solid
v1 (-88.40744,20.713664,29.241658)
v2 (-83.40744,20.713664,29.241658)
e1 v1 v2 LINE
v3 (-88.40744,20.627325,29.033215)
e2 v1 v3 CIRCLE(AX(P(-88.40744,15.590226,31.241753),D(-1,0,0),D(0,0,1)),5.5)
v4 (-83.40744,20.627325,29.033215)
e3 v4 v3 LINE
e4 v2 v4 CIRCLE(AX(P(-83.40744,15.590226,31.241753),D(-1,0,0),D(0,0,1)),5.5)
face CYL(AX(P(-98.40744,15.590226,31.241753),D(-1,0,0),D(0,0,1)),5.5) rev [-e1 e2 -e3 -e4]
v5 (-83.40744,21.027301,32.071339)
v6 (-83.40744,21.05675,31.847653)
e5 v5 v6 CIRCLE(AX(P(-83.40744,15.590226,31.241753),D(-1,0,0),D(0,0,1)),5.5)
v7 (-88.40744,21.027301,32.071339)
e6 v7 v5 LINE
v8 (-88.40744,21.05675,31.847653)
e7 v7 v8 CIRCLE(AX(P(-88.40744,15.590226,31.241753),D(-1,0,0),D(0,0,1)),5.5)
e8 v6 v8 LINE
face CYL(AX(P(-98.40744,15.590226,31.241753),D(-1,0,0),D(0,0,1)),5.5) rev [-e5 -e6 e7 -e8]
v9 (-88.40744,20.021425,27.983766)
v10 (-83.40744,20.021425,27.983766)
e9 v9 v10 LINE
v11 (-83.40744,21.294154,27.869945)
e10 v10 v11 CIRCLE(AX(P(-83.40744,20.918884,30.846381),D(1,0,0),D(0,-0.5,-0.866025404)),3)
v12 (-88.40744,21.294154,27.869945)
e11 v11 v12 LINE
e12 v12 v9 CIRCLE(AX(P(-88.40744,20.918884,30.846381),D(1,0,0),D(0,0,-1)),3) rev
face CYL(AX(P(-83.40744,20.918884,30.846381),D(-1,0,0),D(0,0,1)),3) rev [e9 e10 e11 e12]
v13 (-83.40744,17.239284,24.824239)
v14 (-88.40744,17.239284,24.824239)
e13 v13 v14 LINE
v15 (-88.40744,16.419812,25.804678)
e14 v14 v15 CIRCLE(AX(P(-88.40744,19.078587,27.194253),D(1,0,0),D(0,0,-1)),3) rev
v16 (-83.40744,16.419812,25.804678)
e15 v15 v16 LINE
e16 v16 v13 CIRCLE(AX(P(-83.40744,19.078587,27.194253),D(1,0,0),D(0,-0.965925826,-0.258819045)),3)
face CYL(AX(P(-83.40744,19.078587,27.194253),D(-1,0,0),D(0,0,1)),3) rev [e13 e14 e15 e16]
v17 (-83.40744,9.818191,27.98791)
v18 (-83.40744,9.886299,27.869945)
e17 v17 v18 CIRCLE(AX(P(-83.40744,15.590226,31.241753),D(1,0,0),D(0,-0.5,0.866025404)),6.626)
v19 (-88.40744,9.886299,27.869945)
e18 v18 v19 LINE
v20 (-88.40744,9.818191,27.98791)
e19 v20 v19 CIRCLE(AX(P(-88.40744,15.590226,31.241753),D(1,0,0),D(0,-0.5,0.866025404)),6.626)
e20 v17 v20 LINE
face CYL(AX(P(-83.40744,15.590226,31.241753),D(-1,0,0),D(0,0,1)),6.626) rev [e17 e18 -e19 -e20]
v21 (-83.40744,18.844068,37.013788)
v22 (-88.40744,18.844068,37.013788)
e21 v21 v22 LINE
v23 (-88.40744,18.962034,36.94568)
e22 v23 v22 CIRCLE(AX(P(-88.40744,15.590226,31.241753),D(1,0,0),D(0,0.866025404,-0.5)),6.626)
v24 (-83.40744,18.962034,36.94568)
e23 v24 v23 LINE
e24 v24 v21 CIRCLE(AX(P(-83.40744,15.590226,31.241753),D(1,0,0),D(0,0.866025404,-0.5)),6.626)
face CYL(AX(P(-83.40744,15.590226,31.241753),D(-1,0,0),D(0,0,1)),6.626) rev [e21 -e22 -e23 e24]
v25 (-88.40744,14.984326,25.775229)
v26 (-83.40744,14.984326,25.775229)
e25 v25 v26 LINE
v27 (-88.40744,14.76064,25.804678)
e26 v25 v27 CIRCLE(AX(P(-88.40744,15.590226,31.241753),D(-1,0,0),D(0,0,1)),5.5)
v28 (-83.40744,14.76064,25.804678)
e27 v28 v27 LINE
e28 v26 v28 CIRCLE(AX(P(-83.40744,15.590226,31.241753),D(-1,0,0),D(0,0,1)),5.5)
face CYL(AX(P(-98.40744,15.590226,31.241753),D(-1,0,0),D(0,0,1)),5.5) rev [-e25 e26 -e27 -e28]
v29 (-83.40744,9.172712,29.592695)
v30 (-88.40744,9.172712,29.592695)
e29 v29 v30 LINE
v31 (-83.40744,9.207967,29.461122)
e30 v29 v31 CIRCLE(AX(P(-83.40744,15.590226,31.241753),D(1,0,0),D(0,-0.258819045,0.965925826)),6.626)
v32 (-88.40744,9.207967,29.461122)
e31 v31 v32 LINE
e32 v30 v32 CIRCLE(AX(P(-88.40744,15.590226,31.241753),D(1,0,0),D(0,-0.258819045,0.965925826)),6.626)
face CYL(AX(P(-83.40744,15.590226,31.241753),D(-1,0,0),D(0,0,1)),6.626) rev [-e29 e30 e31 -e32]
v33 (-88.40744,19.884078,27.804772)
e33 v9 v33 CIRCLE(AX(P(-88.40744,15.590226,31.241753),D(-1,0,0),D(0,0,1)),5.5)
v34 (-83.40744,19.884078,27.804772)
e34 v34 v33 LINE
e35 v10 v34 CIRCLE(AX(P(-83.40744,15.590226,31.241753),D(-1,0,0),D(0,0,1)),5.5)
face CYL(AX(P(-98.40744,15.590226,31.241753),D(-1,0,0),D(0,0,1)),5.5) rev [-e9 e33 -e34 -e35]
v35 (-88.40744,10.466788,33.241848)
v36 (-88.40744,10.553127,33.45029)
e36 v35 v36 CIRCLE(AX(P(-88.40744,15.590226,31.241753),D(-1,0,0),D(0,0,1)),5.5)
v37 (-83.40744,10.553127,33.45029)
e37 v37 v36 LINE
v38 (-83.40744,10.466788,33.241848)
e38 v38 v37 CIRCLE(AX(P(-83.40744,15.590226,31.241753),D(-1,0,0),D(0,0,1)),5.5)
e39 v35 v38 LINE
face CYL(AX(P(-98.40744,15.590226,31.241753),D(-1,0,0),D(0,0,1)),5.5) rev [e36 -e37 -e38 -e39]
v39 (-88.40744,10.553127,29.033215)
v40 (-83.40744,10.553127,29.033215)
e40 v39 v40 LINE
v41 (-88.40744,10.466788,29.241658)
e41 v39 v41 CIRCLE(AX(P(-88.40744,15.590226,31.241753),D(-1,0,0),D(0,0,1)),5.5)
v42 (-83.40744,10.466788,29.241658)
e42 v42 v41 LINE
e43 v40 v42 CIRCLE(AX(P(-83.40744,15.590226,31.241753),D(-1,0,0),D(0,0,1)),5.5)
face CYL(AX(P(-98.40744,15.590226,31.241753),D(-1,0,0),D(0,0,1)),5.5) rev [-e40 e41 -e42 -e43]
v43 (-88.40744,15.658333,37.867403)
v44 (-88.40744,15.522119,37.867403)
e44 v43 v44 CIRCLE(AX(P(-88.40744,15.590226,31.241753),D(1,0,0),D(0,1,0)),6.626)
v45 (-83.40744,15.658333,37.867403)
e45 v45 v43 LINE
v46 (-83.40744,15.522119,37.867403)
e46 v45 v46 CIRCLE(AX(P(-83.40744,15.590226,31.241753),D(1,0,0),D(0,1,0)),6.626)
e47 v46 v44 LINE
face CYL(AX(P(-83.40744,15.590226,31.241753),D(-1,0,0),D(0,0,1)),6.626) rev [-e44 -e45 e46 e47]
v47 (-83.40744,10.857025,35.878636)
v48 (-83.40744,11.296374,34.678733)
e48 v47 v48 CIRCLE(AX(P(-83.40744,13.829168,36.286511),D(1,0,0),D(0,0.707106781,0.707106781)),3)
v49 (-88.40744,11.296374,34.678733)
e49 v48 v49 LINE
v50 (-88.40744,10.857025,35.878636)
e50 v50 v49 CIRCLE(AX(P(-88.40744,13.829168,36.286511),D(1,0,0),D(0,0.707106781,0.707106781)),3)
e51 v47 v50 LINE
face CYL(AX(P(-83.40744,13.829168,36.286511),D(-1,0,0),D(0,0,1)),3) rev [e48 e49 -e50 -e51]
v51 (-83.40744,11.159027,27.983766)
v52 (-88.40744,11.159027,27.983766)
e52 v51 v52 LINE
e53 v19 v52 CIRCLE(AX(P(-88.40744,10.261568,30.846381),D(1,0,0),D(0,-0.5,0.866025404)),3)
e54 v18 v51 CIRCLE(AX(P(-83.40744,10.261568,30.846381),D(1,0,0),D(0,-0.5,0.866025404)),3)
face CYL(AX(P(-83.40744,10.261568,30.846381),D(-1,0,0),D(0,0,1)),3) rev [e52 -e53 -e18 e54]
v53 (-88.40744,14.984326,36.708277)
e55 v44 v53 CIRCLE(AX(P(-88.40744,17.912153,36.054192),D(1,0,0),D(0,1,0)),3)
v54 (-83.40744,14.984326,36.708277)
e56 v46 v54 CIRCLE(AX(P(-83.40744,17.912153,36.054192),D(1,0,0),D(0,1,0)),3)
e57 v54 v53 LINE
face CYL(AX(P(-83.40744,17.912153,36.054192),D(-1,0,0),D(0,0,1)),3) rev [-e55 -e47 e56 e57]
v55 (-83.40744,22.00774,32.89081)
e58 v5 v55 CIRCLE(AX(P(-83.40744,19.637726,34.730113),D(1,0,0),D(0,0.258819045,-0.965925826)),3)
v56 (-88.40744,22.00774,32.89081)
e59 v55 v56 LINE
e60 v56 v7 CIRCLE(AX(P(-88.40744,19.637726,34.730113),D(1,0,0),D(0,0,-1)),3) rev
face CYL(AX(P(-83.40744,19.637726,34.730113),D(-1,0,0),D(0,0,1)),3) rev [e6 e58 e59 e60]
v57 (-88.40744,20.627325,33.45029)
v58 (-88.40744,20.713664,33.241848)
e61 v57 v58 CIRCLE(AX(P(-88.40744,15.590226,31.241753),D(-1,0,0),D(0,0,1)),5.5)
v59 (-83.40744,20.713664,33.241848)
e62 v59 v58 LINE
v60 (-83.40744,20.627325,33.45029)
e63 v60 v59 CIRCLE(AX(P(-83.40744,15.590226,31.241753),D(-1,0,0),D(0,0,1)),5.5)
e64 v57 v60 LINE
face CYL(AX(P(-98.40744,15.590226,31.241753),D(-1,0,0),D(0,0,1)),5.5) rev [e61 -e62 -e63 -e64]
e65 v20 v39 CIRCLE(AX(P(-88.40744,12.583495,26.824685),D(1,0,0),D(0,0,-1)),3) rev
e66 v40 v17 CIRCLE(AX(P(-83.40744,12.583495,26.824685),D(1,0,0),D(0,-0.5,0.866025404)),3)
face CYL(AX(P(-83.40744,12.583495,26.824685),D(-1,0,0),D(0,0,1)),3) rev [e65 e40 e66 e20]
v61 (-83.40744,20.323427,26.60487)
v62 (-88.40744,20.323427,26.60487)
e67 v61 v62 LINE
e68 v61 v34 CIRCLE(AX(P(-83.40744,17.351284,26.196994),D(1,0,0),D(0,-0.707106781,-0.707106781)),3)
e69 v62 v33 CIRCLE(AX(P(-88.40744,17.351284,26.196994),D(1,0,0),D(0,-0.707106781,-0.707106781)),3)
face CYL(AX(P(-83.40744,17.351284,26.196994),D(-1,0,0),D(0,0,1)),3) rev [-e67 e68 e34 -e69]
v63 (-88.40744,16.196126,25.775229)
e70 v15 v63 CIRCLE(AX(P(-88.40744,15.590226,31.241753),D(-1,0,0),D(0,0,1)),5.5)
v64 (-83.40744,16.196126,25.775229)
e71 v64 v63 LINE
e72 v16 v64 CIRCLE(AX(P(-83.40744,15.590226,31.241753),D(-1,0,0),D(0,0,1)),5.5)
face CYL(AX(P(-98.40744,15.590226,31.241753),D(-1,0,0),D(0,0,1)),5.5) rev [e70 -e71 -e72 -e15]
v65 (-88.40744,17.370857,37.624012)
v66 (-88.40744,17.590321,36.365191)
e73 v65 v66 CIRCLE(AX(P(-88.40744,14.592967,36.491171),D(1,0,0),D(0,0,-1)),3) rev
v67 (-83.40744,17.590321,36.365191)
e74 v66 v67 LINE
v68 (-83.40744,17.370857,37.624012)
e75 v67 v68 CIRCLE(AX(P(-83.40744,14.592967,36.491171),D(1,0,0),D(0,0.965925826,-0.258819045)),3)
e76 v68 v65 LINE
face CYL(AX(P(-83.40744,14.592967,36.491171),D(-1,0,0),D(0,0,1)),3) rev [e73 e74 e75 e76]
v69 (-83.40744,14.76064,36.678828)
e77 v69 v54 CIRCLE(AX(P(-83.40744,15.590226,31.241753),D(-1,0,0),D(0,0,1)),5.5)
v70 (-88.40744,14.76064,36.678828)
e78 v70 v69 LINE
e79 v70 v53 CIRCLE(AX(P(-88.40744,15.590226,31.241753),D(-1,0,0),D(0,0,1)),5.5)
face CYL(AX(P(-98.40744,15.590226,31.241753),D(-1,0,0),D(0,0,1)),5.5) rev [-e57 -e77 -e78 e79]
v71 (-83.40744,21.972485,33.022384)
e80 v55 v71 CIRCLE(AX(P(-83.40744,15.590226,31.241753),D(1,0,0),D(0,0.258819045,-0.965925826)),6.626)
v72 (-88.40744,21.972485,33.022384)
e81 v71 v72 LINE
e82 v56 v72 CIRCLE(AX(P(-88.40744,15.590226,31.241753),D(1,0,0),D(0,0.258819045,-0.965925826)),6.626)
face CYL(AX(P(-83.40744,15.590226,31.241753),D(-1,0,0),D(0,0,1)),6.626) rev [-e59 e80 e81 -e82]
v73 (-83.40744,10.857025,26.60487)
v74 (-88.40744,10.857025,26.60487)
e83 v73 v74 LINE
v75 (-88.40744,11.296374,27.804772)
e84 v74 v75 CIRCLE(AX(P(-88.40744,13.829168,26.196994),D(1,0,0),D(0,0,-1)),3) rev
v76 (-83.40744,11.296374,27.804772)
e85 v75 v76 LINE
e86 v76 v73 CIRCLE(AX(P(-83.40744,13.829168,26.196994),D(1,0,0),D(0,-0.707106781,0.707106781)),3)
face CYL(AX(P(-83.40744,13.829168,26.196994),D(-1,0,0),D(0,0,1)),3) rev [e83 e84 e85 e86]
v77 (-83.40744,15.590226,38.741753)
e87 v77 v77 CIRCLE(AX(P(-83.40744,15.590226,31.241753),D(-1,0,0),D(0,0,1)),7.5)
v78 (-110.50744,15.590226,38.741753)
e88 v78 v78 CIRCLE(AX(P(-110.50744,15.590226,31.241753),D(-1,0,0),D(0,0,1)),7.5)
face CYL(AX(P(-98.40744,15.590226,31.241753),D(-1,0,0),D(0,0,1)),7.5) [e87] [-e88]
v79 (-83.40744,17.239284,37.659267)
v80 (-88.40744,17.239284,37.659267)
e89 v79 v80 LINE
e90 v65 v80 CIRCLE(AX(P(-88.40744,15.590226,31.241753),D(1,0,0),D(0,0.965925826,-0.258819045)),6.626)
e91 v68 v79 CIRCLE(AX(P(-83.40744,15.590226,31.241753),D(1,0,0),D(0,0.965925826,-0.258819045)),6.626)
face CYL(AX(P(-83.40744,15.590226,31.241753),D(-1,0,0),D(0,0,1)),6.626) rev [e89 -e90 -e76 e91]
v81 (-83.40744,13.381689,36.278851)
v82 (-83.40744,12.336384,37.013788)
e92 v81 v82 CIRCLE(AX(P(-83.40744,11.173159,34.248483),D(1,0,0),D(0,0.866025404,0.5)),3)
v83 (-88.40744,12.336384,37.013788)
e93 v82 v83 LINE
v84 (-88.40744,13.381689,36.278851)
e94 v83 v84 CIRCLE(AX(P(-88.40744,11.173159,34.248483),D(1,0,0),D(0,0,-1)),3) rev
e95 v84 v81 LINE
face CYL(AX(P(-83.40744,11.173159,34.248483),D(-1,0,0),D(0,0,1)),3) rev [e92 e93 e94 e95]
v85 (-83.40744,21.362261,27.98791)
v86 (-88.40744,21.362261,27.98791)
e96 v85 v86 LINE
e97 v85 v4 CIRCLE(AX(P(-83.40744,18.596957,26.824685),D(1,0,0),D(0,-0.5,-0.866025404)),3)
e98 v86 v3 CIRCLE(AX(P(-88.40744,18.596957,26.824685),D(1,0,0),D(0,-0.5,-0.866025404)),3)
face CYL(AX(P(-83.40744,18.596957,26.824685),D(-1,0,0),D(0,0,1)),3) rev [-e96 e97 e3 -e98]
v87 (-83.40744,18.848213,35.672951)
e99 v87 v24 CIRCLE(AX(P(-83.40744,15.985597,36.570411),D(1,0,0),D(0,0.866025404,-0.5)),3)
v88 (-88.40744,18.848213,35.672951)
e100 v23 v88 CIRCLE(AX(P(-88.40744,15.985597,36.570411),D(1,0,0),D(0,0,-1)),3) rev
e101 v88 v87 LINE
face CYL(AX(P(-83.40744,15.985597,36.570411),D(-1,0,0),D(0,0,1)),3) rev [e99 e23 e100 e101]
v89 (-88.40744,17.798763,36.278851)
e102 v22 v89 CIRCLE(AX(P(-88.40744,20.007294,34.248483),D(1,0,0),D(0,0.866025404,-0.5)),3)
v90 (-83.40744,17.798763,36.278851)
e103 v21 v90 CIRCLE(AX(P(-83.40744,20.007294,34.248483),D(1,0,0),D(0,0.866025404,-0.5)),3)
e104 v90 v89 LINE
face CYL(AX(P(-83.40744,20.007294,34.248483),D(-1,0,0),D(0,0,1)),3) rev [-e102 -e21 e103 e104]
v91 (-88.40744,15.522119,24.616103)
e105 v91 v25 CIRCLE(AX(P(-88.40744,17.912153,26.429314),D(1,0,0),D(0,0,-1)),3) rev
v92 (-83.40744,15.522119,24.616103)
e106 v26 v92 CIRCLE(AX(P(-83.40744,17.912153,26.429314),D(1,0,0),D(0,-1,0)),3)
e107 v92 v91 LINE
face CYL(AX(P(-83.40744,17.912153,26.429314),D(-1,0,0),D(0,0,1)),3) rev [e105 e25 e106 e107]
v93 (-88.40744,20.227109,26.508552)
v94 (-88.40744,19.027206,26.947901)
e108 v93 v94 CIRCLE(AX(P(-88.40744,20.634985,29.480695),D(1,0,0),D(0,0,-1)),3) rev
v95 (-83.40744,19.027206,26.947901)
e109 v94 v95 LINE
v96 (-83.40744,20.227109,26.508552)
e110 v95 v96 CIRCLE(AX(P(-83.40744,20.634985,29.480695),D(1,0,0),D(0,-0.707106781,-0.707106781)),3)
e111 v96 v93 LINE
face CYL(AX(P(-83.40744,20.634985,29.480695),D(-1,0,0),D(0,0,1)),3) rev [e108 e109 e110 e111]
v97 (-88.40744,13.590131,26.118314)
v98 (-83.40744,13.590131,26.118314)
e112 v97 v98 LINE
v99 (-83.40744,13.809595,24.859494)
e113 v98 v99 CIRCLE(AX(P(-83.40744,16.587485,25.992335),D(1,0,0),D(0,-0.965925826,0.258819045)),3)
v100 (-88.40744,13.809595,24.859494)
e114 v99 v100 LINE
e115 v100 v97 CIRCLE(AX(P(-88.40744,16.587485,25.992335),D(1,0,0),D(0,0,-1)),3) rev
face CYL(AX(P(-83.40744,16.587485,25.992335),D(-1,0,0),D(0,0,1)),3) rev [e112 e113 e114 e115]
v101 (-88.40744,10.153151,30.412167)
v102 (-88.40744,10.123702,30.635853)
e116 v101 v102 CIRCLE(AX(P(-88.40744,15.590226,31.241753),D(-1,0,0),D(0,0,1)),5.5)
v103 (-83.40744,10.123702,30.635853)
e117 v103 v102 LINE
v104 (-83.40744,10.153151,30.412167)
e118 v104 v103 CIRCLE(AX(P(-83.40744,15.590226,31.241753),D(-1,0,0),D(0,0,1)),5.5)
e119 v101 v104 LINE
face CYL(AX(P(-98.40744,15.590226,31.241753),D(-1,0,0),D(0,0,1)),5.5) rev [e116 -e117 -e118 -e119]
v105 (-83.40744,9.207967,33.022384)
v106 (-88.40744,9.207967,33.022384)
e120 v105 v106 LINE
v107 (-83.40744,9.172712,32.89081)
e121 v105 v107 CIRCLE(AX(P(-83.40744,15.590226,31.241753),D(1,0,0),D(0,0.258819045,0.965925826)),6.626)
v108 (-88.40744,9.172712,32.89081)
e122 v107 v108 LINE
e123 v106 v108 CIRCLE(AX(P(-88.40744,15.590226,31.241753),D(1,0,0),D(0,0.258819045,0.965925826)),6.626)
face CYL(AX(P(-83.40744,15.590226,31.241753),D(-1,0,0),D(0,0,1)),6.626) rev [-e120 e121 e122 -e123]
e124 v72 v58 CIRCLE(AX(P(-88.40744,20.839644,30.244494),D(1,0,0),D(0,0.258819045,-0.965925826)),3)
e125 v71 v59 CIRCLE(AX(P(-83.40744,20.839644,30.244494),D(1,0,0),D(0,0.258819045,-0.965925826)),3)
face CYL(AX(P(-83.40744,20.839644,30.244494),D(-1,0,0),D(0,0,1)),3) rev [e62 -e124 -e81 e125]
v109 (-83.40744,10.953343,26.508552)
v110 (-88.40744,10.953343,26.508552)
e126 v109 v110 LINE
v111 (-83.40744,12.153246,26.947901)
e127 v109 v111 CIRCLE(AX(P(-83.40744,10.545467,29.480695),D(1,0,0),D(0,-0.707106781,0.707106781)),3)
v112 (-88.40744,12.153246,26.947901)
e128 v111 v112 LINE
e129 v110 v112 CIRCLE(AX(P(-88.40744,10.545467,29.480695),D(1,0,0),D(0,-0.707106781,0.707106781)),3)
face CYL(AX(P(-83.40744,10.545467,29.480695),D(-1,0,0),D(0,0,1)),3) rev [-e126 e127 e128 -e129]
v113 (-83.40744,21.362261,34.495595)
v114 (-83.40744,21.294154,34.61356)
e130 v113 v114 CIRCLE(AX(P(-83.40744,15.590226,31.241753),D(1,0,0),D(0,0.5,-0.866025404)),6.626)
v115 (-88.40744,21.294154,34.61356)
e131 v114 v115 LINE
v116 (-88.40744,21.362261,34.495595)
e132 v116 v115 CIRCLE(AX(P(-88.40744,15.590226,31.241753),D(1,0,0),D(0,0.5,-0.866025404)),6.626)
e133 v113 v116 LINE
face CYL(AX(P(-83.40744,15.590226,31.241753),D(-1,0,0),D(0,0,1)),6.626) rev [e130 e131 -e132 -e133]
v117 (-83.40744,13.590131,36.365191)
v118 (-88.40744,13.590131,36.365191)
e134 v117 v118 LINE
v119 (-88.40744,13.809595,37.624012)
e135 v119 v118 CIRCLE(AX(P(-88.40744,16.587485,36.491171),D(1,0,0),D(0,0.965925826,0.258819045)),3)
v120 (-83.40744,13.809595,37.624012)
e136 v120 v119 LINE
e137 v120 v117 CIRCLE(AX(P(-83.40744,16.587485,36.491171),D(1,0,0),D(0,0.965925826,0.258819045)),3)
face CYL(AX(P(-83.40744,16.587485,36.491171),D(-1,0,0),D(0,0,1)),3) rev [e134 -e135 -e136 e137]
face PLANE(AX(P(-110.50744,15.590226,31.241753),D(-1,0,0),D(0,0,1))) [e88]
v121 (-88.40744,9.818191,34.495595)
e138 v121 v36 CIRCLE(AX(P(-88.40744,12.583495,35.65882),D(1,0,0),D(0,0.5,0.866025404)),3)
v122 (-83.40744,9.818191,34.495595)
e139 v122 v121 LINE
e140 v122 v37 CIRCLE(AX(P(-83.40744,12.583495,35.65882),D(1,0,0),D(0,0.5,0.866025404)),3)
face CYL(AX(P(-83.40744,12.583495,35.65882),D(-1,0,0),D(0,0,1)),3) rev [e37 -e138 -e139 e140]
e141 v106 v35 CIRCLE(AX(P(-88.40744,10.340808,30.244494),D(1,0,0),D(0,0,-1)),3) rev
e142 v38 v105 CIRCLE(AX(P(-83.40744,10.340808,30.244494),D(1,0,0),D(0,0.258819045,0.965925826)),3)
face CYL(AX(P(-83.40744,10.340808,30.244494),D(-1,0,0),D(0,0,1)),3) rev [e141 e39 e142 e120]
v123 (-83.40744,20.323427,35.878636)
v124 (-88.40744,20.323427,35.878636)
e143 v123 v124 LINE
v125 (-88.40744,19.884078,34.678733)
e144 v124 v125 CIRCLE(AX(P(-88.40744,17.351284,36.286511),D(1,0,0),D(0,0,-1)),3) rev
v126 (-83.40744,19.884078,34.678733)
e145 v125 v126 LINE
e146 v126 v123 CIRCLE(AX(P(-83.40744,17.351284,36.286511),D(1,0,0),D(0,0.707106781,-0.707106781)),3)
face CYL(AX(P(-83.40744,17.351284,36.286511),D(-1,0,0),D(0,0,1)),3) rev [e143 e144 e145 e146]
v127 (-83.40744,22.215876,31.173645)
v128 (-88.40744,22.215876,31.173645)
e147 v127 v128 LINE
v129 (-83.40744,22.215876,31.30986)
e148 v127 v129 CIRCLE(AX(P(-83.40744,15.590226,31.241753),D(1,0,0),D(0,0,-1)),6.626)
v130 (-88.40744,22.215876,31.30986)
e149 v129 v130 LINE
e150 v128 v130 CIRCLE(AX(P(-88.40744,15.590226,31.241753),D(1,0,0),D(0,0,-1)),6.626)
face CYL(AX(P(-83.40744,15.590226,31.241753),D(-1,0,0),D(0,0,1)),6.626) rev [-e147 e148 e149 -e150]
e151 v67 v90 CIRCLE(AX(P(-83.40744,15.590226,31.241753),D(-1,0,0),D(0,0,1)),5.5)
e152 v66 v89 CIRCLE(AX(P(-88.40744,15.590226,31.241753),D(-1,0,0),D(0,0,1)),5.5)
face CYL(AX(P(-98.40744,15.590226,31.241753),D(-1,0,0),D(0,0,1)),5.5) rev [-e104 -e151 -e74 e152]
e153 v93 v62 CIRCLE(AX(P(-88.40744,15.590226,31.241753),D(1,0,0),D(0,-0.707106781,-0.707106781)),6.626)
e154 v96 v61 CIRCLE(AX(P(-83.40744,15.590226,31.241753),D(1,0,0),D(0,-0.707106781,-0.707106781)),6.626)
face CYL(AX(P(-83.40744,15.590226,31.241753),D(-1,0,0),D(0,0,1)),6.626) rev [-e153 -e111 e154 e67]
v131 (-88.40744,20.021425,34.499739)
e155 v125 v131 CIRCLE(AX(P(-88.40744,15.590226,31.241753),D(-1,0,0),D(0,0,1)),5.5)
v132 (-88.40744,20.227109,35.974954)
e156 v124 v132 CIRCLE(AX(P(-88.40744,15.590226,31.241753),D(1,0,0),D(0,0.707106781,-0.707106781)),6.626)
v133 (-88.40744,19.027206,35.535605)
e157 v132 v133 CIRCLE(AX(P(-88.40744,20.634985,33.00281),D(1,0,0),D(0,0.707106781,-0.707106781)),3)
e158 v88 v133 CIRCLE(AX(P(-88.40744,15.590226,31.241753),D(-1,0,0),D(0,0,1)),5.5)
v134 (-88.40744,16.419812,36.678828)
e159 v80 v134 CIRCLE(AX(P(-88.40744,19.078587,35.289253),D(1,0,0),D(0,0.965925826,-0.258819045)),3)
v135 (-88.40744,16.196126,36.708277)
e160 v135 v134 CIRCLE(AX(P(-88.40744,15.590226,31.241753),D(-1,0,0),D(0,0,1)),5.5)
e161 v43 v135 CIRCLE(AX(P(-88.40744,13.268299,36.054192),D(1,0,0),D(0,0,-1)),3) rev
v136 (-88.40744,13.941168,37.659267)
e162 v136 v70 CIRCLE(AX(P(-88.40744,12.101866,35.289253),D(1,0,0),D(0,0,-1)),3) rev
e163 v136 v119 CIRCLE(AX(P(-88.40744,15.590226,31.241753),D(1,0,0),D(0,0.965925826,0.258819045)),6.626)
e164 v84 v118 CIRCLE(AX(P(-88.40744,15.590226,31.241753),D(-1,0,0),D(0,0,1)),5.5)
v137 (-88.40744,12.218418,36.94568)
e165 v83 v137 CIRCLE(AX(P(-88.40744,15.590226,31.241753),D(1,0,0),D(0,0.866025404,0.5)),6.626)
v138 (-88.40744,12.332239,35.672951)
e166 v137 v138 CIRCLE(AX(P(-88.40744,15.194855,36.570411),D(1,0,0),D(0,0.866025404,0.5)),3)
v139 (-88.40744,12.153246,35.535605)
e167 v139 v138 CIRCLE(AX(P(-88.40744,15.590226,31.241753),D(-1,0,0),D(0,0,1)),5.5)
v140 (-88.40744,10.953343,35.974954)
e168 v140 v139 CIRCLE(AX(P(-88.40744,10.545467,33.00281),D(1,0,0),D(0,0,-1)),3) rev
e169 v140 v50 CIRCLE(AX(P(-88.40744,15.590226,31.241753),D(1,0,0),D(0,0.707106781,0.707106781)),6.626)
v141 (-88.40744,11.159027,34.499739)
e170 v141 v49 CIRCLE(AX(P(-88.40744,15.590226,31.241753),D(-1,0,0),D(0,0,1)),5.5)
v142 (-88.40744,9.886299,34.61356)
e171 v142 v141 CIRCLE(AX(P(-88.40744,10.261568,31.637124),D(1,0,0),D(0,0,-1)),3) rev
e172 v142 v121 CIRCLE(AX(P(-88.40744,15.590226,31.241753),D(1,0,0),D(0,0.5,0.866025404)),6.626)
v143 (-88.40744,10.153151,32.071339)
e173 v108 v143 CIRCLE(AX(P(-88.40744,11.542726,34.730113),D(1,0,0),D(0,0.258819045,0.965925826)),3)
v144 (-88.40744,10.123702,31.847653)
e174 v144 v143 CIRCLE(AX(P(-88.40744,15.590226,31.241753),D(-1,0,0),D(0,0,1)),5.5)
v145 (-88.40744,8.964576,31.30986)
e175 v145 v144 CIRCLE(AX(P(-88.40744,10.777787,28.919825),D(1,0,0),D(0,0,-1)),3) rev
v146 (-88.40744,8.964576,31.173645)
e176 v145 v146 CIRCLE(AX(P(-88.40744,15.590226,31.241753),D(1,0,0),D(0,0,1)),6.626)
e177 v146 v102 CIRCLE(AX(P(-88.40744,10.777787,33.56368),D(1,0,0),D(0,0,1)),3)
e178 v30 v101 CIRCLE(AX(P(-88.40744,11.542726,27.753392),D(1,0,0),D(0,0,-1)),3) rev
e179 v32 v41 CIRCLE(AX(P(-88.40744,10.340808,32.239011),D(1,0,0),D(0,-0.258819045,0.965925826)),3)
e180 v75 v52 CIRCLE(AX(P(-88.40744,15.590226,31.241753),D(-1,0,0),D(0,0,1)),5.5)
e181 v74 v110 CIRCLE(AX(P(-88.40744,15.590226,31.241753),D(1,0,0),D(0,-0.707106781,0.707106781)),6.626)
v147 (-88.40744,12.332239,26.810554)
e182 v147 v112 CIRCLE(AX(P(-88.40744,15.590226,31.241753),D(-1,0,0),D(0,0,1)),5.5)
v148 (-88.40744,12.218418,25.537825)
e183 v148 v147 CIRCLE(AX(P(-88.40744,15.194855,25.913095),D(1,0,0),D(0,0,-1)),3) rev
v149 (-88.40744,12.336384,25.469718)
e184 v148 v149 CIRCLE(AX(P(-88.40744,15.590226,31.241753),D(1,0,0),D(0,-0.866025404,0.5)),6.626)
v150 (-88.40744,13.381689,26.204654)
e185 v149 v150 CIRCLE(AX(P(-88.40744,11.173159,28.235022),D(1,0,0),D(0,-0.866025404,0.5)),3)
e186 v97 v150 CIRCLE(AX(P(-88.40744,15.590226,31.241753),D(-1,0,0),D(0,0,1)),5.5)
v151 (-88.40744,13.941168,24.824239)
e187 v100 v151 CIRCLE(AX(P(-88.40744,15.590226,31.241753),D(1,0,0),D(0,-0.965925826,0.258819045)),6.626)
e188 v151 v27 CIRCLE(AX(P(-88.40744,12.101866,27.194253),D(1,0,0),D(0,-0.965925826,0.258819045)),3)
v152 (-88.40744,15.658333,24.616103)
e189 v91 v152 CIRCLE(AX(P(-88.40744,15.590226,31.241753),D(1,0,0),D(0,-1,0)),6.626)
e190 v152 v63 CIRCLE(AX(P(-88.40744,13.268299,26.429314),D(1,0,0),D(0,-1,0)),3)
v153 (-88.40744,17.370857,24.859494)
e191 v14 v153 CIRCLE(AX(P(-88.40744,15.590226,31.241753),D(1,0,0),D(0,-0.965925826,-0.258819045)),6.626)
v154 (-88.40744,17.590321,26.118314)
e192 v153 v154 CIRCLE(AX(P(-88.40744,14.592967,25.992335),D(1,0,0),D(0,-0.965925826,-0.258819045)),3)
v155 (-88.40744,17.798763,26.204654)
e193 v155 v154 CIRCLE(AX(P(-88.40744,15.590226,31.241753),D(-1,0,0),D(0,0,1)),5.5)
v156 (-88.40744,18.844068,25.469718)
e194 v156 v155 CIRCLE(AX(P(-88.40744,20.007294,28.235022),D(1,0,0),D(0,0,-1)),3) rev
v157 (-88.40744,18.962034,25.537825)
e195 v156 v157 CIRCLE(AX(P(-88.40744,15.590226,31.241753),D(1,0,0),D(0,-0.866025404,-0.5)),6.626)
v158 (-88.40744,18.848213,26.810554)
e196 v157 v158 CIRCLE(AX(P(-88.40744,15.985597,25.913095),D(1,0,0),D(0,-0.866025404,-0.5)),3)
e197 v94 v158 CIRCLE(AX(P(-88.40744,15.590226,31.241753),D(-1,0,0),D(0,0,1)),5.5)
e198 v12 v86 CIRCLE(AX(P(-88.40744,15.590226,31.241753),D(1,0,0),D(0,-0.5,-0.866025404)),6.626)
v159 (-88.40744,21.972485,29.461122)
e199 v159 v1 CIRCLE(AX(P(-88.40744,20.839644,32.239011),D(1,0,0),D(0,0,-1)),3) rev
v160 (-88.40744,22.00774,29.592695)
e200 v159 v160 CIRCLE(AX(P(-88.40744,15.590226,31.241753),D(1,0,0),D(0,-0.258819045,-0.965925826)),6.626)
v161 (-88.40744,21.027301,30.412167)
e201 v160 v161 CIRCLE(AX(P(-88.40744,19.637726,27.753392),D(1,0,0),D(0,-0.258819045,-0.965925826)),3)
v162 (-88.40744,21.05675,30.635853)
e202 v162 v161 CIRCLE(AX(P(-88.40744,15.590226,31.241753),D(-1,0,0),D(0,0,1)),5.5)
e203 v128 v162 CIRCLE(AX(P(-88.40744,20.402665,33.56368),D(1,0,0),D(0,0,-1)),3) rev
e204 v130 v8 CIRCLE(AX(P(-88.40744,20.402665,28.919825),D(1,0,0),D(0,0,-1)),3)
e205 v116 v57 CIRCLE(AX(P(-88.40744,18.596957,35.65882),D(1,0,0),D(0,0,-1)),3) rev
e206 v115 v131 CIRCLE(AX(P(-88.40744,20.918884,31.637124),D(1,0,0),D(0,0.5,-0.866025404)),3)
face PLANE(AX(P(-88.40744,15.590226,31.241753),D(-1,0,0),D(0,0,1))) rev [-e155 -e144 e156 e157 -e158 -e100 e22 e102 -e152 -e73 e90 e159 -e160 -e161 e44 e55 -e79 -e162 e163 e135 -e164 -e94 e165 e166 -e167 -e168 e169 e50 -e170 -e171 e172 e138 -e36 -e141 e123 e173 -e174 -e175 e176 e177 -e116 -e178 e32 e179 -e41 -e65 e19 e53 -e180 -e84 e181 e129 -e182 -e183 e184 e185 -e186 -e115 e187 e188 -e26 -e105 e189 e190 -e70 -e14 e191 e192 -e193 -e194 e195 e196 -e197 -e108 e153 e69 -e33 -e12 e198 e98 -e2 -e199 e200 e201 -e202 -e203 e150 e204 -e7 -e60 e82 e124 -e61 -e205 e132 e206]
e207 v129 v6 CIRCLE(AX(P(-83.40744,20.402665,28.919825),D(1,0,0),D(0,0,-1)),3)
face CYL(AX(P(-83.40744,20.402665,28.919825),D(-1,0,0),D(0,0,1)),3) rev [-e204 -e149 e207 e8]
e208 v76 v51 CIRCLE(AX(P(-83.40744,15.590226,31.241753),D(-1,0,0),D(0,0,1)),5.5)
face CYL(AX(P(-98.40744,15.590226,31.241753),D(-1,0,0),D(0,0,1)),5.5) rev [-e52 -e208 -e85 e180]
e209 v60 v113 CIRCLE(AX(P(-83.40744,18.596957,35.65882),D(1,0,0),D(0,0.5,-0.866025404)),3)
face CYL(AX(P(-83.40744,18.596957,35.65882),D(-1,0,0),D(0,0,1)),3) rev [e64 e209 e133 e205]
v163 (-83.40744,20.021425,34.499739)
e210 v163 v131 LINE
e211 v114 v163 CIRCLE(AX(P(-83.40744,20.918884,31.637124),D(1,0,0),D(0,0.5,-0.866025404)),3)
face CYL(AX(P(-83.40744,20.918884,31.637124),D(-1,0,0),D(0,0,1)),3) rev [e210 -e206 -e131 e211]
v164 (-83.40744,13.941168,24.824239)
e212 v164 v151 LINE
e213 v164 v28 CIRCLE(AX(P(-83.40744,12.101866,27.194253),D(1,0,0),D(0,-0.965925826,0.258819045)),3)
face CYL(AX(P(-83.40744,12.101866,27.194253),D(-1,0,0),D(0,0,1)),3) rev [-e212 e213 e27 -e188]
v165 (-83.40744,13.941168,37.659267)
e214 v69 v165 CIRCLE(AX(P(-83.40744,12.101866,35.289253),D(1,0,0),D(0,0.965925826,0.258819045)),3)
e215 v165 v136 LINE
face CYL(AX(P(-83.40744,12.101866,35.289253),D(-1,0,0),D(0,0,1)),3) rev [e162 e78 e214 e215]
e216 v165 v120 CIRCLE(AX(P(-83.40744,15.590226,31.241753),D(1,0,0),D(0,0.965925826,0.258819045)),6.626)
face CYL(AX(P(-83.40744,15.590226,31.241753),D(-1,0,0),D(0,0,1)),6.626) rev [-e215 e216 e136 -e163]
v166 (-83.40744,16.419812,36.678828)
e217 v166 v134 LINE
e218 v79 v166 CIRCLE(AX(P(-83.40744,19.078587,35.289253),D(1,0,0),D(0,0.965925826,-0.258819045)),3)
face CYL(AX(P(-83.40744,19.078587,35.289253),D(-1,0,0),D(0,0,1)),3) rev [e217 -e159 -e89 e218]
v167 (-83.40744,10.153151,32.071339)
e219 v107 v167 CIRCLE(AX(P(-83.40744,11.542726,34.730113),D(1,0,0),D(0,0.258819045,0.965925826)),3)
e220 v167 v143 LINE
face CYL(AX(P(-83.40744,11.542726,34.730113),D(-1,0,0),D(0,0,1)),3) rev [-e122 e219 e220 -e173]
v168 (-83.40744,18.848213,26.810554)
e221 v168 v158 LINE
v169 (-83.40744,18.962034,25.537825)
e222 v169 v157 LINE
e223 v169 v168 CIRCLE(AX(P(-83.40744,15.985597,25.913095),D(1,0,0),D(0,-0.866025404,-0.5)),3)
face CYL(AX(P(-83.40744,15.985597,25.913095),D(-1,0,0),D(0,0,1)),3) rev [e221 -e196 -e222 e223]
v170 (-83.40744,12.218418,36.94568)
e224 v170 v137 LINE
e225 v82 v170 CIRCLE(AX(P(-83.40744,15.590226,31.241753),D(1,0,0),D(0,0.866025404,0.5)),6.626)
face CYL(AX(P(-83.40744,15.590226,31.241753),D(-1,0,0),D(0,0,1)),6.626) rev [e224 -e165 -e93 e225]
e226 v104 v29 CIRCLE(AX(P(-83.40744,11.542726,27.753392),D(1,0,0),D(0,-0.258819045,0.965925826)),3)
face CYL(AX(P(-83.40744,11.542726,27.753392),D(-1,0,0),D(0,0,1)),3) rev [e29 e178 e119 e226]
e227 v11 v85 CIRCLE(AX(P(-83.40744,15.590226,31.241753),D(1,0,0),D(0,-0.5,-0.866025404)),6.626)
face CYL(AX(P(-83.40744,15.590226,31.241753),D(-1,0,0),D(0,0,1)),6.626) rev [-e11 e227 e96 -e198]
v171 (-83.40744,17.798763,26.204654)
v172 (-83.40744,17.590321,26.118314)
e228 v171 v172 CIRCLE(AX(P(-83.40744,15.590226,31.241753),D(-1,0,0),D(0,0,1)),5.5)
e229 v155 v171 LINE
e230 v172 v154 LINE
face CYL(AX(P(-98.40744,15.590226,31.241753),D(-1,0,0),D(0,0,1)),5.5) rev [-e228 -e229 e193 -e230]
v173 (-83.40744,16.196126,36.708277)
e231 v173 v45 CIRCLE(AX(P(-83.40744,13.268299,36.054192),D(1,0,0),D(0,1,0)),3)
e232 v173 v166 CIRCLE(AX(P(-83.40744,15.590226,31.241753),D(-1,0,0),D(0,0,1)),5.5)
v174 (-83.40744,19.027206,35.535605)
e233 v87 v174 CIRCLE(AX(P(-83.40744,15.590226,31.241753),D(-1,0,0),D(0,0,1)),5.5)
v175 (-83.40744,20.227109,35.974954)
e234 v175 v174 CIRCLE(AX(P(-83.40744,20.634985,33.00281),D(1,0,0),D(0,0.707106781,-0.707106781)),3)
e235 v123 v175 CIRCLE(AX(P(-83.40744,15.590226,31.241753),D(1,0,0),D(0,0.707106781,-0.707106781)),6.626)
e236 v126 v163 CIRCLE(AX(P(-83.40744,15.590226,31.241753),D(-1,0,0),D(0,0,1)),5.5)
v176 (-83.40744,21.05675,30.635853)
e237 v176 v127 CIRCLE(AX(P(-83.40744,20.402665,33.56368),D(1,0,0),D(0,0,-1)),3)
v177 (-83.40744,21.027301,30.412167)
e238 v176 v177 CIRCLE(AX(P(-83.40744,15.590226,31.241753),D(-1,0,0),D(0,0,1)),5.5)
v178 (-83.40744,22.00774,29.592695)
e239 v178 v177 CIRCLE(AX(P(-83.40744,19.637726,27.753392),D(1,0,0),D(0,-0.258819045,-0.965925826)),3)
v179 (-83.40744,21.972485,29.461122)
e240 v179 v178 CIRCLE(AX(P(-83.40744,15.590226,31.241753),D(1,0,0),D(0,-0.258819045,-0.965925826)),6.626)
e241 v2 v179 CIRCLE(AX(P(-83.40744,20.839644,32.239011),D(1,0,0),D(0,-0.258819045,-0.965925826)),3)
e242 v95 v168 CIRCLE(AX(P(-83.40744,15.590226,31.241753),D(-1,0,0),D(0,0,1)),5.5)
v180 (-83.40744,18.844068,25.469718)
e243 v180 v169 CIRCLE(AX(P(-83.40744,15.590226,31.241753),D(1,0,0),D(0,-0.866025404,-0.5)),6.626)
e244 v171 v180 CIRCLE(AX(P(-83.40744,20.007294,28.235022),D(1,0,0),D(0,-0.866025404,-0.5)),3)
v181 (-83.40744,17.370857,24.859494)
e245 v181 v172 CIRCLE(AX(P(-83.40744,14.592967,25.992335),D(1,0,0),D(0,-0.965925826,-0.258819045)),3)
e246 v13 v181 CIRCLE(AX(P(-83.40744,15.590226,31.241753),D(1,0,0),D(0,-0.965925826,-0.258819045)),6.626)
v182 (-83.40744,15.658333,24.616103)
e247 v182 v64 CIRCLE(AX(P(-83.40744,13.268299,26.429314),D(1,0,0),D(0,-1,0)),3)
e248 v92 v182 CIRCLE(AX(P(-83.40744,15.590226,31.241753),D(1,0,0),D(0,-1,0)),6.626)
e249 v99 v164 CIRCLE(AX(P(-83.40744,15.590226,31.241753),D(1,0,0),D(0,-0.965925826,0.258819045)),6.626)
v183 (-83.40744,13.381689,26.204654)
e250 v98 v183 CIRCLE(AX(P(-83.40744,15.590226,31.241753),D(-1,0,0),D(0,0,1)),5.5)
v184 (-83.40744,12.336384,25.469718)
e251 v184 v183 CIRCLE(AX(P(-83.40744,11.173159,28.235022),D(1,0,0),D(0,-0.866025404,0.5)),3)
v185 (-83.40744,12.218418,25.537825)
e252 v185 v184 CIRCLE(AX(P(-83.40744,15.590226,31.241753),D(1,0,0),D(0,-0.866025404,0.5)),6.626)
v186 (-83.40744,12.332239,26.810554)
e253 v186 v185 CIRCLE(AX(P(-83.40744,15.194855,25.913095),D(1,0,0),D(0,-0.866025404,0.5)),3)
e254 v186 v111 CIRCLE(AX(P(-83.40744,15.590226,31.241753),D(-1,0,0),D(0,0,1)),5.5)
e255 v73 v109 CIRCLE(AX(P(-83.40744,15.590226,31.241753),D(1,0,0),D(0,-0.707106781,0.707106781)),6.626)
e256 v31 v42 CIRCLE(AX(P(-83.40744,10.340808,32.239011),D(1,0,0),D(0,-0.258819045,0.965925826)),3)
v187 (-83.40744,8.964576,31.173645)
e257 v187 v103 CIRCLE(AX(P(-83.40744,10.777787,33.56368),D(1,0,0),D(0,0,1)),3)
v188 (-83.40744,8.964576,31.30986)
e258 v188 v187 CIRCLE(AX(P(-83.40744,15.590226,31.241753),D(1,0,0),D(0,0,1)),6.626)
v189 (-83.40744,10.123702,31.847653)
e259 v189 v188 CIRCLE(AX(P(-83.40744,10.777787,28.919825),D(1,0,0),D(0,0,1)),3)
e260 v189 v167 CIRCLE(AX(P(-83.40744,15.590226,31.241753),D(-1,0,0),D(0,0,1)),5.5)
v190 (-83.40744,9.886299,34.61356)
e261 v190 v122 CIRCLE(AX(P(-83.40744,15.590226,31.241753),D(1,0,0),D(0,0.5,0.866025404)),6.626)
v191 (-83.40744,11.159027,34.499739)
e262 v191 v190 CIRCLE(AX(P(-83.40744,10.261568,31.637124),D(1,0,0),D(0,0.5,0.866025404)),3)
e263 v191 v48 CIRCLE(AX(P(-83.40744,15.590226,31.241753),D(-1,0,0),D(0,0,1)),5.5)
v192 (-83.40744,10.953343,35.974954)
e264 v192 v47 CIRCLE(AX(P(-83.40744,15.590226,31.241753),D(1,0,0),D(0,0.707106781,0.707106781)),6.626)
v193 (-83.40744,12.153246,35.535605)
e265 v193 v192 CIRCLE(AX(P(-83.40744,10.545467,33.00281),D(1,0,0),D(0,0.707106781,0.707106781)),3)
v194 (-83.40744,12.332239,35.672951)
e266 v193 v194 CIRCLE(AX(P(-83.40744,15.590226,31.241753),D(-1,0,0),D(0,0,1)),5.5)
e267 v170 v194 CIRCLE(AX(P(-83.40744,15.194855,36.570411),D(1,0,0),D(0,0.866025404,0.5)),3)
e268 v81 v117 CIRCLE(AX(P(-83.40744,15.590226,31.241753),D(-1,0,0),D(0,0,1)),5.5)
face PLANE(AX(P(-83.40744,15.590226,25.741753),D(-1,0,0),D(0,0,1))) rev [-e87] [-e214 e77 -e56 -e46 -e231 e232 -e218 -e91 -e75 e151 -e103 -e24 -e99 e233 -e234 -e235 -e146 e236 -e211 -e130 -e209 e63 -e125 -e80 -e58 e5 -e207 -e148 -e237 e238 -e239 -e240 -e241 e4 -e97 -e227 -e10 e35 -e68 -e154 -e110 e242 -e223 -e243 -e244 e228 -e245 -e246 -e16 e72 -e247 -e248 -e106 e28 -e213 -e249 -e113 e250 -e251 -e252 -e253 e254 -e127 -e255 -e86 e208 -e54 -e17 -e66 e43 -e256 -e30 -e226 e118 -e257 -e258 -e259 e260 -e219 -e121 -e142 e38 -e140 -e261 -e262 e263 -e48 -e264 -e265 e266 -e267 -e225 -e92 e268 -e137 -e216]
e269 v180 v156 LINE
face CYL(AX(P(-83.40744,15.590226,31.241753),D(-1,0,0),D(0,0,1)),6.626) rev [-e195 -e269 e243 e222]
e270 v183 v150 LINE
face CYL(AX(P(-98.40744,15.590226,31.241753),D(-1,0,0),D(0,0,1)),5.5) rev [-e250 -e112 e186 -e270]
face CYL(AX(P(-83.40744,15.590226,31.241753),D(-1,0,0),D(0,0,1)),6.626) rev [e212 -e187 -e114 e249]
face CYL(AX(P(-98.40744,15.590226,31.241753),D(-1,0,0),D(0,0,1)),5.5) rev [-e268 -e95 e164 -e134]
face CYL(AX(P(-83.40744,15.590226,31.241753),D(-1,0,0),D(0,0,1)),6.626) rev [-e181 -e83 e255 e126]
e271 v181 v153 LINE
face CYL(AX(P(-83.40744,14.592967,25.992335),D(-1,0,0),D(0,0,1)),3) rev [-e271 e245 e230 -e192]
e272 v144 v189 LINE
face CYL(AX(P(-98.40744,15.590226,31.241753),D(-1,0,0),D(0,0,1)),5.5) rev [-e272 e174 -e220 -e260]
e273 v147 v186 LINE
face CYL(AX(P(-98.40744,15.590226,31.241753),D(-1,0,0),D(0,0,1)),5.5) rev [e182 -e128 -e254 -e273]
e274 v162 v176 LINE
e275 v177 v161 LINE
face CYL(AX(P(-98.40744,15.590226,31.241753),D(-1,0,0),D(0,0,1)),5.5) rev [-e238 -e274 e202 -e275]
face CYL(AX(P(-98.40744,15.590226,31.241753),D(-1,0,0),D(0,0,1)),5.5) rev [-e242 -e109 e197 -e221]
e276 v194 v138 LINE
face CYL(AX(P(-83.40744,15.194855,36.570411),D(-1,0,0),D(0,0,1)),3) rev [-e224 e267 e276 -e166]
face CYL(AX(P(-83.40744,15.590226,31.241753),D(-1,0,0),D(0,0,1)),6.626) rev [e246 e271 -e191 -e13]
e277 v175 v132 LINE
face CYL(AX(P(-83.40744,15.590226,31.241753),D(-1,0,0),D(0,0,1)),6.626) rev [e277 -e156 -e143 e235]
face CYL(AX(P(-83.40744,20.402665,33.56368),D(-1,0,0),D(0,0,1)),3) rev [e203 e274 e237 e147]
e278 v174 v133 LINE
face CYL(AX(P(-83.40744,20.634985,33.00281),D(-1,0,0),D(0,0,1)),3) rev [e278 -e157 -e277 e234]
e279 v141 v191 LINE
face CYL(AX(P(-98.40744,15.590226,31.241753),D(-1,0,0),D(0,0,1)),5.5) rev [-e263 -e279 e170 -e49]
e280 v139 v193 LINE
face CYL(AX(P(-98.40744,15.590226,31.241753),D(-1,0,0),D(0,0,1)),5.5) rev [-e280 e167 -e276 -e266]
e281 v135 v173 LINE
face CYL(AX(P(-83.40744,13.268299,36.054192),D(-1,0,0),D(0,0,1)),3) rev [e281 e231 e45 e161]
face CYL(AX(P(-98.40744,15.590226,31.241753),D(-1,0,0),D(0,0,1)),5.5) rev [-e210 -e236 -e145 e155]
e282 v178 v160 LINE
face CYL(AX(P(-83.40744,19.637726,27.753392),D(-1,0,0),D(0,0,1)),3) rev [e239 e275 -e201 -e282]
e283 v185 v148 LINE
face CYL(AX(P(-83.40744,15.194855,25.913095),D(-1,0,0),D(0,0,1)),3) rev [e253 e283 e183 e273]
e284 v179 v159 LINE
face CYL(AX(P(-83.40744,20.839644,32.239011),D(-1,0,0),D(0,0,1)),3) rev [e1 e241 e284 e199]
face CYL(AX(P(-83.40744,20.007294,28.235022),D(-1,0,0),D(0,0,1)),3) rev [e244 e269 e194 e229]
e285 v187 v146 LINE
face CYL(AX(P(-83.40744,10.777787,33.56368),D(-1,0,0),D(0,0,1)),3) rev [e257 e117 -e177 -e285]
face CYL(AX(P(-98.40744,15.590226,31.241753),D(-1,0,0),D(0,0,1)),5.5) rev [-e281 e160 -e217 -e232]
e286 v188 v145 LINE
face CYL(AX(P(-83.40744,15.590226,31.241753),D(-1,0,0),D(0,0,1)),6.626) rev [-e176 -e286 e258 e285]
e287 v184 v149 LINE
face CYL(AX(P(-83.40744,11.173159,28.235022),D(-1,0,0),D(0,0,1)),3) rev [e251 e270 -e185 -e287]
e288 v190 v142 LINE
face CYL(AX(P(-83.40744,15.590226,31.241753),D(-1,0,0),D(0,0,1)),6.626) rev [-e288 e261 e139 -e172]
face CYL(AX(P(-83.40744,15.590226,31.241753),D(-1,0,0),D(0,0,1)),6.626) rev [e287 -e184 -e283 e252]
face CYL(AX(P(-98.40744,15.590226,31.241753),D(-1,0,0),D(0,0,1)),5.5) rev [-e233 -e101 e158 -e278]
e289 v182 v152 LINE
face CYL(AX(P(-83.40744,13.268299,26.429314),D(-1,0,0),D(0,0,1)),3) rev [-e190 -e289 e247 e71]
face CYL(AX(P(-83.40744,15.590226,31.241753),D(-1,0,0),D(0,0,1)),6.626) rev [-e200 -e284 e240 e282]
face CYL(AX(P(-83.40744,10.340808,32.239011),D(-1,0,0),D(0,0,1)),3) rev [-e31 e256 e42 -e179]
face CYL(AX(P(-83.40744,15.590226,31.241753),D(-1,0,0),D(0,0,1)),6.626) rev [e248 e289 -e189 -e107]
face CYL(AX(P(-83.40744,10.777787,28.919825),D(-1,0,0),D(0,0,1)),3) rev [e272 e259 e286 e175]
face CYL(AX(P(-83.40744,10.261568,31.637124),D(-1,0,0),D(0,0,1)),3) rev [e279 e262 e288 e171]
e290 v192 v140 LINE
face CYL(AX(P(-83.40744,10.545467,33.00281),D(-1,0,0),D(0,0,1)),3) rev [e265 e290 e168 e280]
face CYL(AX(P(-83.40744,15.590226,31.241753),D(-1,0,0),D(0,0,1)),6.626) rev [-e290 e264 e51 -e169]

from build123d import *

# Parameters (mm, degrees)
INTERNAL_START                  = -88.407440494
INTERNAL_SPUR_GEAR_AM_OUTLINE_R = 7.5
INTERNAL_SPUR_GEAR_AM_DEPTH     = 5
BOSS_EXTRUDE2_START             = 22.1
SKETCH3_R                       = 7.5
BOSS_EXTRUDE2_DEPTH             = 22.1


# Read off the part's stored shape, not the designer's step: internal spur gear_am
with BuildPart() as part:
    # internal spur gear_am outline → internal spur gear_am (new body)
    with BuildSketch(Plane.YZ.offset(INTERNAL_START)):
        with Locations((15.590226083, 31.241752714)):
            Circle(INTERNAL_SPUR_GEAR_AM_OUTLINE_R)
        with BuildLine():
            ThreePointArc((22.215876043, 31.173645397), (21.665278496, 30.84231879), (21.056750139, 30.635852768))
            ThreePointArc((21.056750139, 30.635852768), (21.043172821, 30.523858657), (21.027301295, 30.412166585))
            ThreePointArc((21.027301295, 30.412166585), (21.561657212, 30.055236993), (22.007739967, 29.592694935))
            ThreePointArc((22.007739967, 29.592694935), (21.990450608, 29.526817722), (21.972485025, 29.461121702))
            ThreePointArc((21.972485025, 29.461121702), (21.354894998, 29.283589907), (20.713664403, 29.241657772))
            ThreePointArc((20.713664403, 29.241657772), (20.671563512, 29.136993836), (20.62732476, 29.033215432))
            ThreePointArc((20.62732476, 29.033215432), (21.051092764, 28.550146434), (21.362260924, 27.987910402))
            ThreePointArc((21.362260924, 27.987910402), (21.328510409, 27.928752714), (21.294153607, 27.869945067))
            ThreePointArc((21.294153607, 27.869945067), (20.65165884, 27.858306583), (20.021424813, 27.98376594))
            ThreePointArc((20.021424813, 27.98376594), (19.953669455, 27.893564855), (19.884078274, 27.804772446))
            ThreePointArc((19.884078274, 27.804772446), (20.168379277, 27.228484394), (20.323427246, 26.604869844))
            ThreePointArc((20.323427246, 26.604869844), (20.275515615, 26.556463182), (20.227108954, 26.508551552))
            ThreePointArc((20.227108954, 26.508551552), (19.603494404, 26.663599521), (19.027206352, 26.947900524))
            ThreePointArc((19.027206352, 26.947900524), (18.938413943, 26.878309343), (18.848212857, 26.810553985))
            ThreePointArc((18.848212857, 26.810553985), (18.973672215, 26.180319958), (18.96203373, 25.537825191))
            ThreePointArc((18.96203373, 25.537825191), (18.903226083, 25.503468389), (18.844068396, 25.469717874))
            ThreePointArc((18.844068396, 25.469717874), (18.281832364, 25.780886034), (17.798763365, 26.204654038))
            ThreePointArc((17.798763365, 26.204654038), (17.694984961, 26.160415286), (17.590321026, 26.118314394))
            ThreePointArc((17.590321026, 26.118314394), (17.548388891, 25.4770838), (17.370857096, 24.859493773))
            ThreePointArc((17.370857096, 24.859493773), (17.305161076, 24.841528189), (17.239283862, 24.824238831))
            ThreePointArc((17.239283862, 24.824238831), (16.776741804, 25.270321586), (16.419812213, 25.804677503))
            ThreePointArc((16.419812213, 25.804677503), (16.308120141, 25.788805977), (16.19612603, 25.775228658))
            ThreePointArc((16.19612603, 25.775228658), (15.989660007, 25.166700302), (15.658333401, 24.616102754))
            ThreePointArc((15.658333401, 24.616102754), (15.590226083, 24.615752714), (15.522118766, 24.616102754))
            ThreePointArc((15.522118766, 24.616102754), (15.190792159, 25.166700301), (14.984326137, 25.775228658))
            ThreePointArc((14.984326137, 25.775228658), (14.872332026, 25.788805977), (14.760639954, 25.804677503))
            ThreePointArc((14.760639954, 25.804677503), (14.403710362, 25.270321586), (13.941168304, 24.824238831))
            ThreePointArc((13.941168304, 24.824238831), (13.87529109, 24.841528189), (13.809595071, 24.859493773))
            ThreePointArc((13.809595071, 24.859493773), (13.632063276, 25.4770838), (13.59013114, 26.118314394))
            ThreePointArc((13.59013114, 26.118314394), (13.485467205, 26.160415286), (13.381688801, 26.204654038))
            ThreePointArc((13.381688801, 26.204654038), (12.898619802, 25.780886034), (12.33638377, 25.469717874))
            ThreePointArc((12.33638377, 25.469717874), (12.277226083, 25.503468389), (12.218418436, 25.537825191))
            ThreePointArc((12.218418436, 25.537825191), (12.206779952, 26.180319958), (12.332239309, 26.810553985))
            ThreePointArc((12.332239309, 26.810553985), (12.242038224, 26.878309343), (12.153245815, 26.947900524))
            ThreePointArc((12.153245815, 26.947900524), (11.576957763, 26.663599521), (10.953343213, 26.508551552))
            ThreePointArc((10.953343213, 26.508551552), (10.904936551, 26.556463182), (10.857024921, 26.604869844))
            ThreePointArc((10.857024921, 26.604869844), (11.01207289, 27.228484394), (11.296373893, 27.804772446))
            ThreePointArc((11.296373893, 27.804772446), (11.226782712, 27.893564855), (11.159027354, 27.98376594))
            ThreePointArc((11.159027354, 27.98376594), (10.528793327, 27.858306583), (9.88629856, 27.869945067))
            ThreePointArc((9.88629856, 27.869945067), (9.851941758, 27.928752714), (9.818191243, 27.987910402))
            ThreePointArc((9.818191243, 27.987910402), (10.129359403, 28.550146434), (10.553127407, 29.033215432))
            ThreePointArc((10.553127407, 29.033215432), (10.508888654, 29.136993836), (10.466787763, 29.241657772))
            ThreePointArc((10.466787763, 29.241657772), (9.825557169, 29.283589907), (9.207967142, 29.461121702))
            ThreePointArc((9.207967142, 29.461121702), (9.190001558, 29.526817721), (9.1727122, 29.592694935))
            ThreePointArc((9.1727122, 29.592694935), (9.618794955, 30.055236993), (10.153150872, 30.412166585))
            ThreePointArc((10.153150872, 30.412166585), (10.137279346, 30.523858657), (10.123702027, 30.635852768))
            ThreePointArc((10.123702027, 30.635852768), (9.51517367, 30.84231879), (8.964576123, 31.173645397))
            ThreePointArc((8.964576123, 31.173645397), (8.964226083, 31.241752715), (8.964576123, 31.309860032))
            ThreePointArc((8.964576123, 31.309860032), (9.51517367, 31.641186639), (10.123702027, 31.847652661))
            ThreePointArc((10.123702027, 31.847652661), (10.137279346, 31.959646772), (10.153150872, 32.071338844))
            ThreePointArc((10.153150872, 32.071338844), (9.618794955, 32.428268436), (9.1727122, 32.890810493))
            ThreePointArc((9.1727122, 32.890810493), (9.190001558, 32.956687707), (9.207967142, 33.022383727))
            ThreePointArc((9.207967142, 33.022383727), (9.825557169, 33.199915522), (10.466787763, 33.241847657))
            ThreePointArc((10.466787763, 33.241847657), (10.508888654, 33.346511592), (10.553127407, 33.450289996))
            ThreePointArc((10.553127407, 33.450289996), (10.129359403, 33.933358995), (9.818191243, 34.495595027))
            ThreePointArc((9.818191243, 34.495595027), (9.851941758, 34.554752714), (9.88629856, 34.613560362))
            ThreePointArc((9.88629856, 34.613560362), (10.528793327, 34.625198846), (11.159027354, 34.499739488))
            ThreePointArc((11.159027354, 34.499739488), (11.226782712, 34.589940574), (11.296373893, 34.678732983))
            ThreePointArc((11.296373893, 34.678732983), (11.01207289, 35.255021035), (10.857024921, 35.878635585))
            ThreePointArc((10.857024921, 35.878635585), (10.904936551, 35.927042247), (10.953343213, 35.974953877))
            ThreePointArc((10.953343213, 35.974953877), (11.576957763, 35.819905908), (12.153245815, 35.535604905))
            ThreePointArc((12.153245815, 35.535604905), (12.242038224, 35.605196086), (12.332239309, 35.672951444))
            ThreePointArc((12.332239309, 35.672951444), (12.206779952, 36.303185471), (12.218418436, 36.945680238))
            ThreePointArc((12.218418436, 36.945680238), (12.277226083, 36.98003704), (12.33638377, 37.013787555))
            ThreePointArc((12.33638377, 37.013787555), (12.898619802, 36.702619395), (13.381688801, 36.278851391))
            ThreePointArc((13.381688801, 36.278851391), (13.485467205, 36.323090143), (13.59013114, 36.365191035))
            ThreePointArc((13.59013114, 36.365191035), (13.632063276, 37.006421629), (13.809595071, 37.624011656))
            ThreePointArc((13.809595071, 37.624011656), (13.875291091, 37.641977239), (13.941168304, 37.659266598))
            ThreePointArc((13.941168304, 37.659266598), (14.403710362, 37.213183843), (14.760639954, 36.678827926))
            ThreePointArc((14.760639954, 36.678827926), (14.872332026, 36.694699452), (14.984326137, 36.70827677))
            ThreePointArc((14.984326137, 36.70827677), (15.190792159, 37.316805127), (15.522118766, 37.867402675))
            ThreePointArc((15.522118766, 37.867402675), (15.590226084, 37.867752714), (15.658333401, 37.867402675))
            ThreePointArc((15.658333401, 37.867402675), (15.989660007, 37.316805127), (16.19612603, 36.70827677))
            ThreePointArc((16.19612603, 36.70827677), (16.308120141, 36.694699452), (16.419812213, 36.678827926))
            ThreePointArc((16.419812213, 36.678827926), (16.776741804, 37.213183843), (17.239283862, 37.659266598))
            ThreePointArc((17.239283862, 37.659266598), (17.305161076, 37.641977239), (17.370857096, 37.624011656))
            ThreePointArc((17.370857096, 37.624011656), (17.548388891, 37.006421629), (17.590321026, 36.365191035))
            ThreePointArc((17.590321026, 36.365191035), (17.694984961, 36.323090143), (17.798763365, 36.278851391))
            ThreePointArc((17.798763365, 36.278851391), (18.281832364, 36.702619395), (18.844068396, 37.013787555))
            ThreePointArc((18.844068396, 37.013787555), (18.903226083, 36.98003704), (18.96203373, 36.945680238))
            ThreePointArc((18.96203373, 36.945680238), (18.973672215, 36.303185471), (18.848212857, 35.672951444))
            ThreePointArc((18.848212857, 35.672951444), (18.938413943, 35.605196086), (19.027206352, 35.535604905))
            ThreePointArc((19.027206352, 35.535604905), (19.603494404, 35.819905908), (20.227108954, 35.974953877))
            ThreePointArc((20.227108954, 35.974953877), (20.275515616, 35.927042247), (20.323427246, 35.878635585))
            ThreePointArc((20.323427246, 35.878635585), (20.168379277, 35.255021035), (19.884078274, 34.678732983))
            ThreePointArc((19.884078274, 34.678732983), (19.953669455, 34.589940574), (20.021424813, 34.499739488))
            ThreePointArc((20.021424813, 34.499739488), (20.65165884, 34.625198846), (21.294153607, 34.613560362))
            ThreePointArc((21.294153607, 34.613560362), (21.328510409, 34.554752714), (21.362260924, 34.495595027))
            ThreePointArc((21.362260924, 34.495595027), (21.051092764, 33.933358995), (20.62732476, 33.450289996))
            ThreePointArc((20.62732476, 33.450289996), (20.671563512, 33.346511592), (20.713664403, 33.241847657))
            ThreePointArc((20.713664403, 33.241847657), (21.354894998, 33.199915522), (21.972485025, 33.022383727))
            ThreePointArc((21.972485025, 33.022383727), (21.990450608, 32.956687707), (22.007739967, 32.890810493))
            ThreePointArc((22.007739967, 32.890810493), (21.561657212, 32.428268436), (21.027301295, 32.071338844))
            ThreePointArc((21.027301295, 32.071338844), (21.043172821, 31.959646772), (21.056750139, 31.847652661))
            ThreePointArc((21.056750139, 31.847652661), (21.665278496, 31.641186639), (22.215876043, 31.309860032))
            ThreePointArc((22.215876043, 31.309860032), (22.216226083, 31.241752714), (22.215876043, 31.173645397))
        make_face(mode=Mode.SUBTRACT)
    extrude(amount=INTERNAL_SPUR_GEAR_AM_DEPTH)

    # Sketch3 → Boss-Extrude2 (add)
    with BuildSketch(Plane.ZY.offset(88.407440494).offset(BOSS_EXTRUDE2_START)):
        with Locations((31.241752714, 15.590226083)):
            Circle(SKETCH3_R)
    extrude(amount=-BOSS_EXTRUDE2_DEPTH)


solid = part.part
